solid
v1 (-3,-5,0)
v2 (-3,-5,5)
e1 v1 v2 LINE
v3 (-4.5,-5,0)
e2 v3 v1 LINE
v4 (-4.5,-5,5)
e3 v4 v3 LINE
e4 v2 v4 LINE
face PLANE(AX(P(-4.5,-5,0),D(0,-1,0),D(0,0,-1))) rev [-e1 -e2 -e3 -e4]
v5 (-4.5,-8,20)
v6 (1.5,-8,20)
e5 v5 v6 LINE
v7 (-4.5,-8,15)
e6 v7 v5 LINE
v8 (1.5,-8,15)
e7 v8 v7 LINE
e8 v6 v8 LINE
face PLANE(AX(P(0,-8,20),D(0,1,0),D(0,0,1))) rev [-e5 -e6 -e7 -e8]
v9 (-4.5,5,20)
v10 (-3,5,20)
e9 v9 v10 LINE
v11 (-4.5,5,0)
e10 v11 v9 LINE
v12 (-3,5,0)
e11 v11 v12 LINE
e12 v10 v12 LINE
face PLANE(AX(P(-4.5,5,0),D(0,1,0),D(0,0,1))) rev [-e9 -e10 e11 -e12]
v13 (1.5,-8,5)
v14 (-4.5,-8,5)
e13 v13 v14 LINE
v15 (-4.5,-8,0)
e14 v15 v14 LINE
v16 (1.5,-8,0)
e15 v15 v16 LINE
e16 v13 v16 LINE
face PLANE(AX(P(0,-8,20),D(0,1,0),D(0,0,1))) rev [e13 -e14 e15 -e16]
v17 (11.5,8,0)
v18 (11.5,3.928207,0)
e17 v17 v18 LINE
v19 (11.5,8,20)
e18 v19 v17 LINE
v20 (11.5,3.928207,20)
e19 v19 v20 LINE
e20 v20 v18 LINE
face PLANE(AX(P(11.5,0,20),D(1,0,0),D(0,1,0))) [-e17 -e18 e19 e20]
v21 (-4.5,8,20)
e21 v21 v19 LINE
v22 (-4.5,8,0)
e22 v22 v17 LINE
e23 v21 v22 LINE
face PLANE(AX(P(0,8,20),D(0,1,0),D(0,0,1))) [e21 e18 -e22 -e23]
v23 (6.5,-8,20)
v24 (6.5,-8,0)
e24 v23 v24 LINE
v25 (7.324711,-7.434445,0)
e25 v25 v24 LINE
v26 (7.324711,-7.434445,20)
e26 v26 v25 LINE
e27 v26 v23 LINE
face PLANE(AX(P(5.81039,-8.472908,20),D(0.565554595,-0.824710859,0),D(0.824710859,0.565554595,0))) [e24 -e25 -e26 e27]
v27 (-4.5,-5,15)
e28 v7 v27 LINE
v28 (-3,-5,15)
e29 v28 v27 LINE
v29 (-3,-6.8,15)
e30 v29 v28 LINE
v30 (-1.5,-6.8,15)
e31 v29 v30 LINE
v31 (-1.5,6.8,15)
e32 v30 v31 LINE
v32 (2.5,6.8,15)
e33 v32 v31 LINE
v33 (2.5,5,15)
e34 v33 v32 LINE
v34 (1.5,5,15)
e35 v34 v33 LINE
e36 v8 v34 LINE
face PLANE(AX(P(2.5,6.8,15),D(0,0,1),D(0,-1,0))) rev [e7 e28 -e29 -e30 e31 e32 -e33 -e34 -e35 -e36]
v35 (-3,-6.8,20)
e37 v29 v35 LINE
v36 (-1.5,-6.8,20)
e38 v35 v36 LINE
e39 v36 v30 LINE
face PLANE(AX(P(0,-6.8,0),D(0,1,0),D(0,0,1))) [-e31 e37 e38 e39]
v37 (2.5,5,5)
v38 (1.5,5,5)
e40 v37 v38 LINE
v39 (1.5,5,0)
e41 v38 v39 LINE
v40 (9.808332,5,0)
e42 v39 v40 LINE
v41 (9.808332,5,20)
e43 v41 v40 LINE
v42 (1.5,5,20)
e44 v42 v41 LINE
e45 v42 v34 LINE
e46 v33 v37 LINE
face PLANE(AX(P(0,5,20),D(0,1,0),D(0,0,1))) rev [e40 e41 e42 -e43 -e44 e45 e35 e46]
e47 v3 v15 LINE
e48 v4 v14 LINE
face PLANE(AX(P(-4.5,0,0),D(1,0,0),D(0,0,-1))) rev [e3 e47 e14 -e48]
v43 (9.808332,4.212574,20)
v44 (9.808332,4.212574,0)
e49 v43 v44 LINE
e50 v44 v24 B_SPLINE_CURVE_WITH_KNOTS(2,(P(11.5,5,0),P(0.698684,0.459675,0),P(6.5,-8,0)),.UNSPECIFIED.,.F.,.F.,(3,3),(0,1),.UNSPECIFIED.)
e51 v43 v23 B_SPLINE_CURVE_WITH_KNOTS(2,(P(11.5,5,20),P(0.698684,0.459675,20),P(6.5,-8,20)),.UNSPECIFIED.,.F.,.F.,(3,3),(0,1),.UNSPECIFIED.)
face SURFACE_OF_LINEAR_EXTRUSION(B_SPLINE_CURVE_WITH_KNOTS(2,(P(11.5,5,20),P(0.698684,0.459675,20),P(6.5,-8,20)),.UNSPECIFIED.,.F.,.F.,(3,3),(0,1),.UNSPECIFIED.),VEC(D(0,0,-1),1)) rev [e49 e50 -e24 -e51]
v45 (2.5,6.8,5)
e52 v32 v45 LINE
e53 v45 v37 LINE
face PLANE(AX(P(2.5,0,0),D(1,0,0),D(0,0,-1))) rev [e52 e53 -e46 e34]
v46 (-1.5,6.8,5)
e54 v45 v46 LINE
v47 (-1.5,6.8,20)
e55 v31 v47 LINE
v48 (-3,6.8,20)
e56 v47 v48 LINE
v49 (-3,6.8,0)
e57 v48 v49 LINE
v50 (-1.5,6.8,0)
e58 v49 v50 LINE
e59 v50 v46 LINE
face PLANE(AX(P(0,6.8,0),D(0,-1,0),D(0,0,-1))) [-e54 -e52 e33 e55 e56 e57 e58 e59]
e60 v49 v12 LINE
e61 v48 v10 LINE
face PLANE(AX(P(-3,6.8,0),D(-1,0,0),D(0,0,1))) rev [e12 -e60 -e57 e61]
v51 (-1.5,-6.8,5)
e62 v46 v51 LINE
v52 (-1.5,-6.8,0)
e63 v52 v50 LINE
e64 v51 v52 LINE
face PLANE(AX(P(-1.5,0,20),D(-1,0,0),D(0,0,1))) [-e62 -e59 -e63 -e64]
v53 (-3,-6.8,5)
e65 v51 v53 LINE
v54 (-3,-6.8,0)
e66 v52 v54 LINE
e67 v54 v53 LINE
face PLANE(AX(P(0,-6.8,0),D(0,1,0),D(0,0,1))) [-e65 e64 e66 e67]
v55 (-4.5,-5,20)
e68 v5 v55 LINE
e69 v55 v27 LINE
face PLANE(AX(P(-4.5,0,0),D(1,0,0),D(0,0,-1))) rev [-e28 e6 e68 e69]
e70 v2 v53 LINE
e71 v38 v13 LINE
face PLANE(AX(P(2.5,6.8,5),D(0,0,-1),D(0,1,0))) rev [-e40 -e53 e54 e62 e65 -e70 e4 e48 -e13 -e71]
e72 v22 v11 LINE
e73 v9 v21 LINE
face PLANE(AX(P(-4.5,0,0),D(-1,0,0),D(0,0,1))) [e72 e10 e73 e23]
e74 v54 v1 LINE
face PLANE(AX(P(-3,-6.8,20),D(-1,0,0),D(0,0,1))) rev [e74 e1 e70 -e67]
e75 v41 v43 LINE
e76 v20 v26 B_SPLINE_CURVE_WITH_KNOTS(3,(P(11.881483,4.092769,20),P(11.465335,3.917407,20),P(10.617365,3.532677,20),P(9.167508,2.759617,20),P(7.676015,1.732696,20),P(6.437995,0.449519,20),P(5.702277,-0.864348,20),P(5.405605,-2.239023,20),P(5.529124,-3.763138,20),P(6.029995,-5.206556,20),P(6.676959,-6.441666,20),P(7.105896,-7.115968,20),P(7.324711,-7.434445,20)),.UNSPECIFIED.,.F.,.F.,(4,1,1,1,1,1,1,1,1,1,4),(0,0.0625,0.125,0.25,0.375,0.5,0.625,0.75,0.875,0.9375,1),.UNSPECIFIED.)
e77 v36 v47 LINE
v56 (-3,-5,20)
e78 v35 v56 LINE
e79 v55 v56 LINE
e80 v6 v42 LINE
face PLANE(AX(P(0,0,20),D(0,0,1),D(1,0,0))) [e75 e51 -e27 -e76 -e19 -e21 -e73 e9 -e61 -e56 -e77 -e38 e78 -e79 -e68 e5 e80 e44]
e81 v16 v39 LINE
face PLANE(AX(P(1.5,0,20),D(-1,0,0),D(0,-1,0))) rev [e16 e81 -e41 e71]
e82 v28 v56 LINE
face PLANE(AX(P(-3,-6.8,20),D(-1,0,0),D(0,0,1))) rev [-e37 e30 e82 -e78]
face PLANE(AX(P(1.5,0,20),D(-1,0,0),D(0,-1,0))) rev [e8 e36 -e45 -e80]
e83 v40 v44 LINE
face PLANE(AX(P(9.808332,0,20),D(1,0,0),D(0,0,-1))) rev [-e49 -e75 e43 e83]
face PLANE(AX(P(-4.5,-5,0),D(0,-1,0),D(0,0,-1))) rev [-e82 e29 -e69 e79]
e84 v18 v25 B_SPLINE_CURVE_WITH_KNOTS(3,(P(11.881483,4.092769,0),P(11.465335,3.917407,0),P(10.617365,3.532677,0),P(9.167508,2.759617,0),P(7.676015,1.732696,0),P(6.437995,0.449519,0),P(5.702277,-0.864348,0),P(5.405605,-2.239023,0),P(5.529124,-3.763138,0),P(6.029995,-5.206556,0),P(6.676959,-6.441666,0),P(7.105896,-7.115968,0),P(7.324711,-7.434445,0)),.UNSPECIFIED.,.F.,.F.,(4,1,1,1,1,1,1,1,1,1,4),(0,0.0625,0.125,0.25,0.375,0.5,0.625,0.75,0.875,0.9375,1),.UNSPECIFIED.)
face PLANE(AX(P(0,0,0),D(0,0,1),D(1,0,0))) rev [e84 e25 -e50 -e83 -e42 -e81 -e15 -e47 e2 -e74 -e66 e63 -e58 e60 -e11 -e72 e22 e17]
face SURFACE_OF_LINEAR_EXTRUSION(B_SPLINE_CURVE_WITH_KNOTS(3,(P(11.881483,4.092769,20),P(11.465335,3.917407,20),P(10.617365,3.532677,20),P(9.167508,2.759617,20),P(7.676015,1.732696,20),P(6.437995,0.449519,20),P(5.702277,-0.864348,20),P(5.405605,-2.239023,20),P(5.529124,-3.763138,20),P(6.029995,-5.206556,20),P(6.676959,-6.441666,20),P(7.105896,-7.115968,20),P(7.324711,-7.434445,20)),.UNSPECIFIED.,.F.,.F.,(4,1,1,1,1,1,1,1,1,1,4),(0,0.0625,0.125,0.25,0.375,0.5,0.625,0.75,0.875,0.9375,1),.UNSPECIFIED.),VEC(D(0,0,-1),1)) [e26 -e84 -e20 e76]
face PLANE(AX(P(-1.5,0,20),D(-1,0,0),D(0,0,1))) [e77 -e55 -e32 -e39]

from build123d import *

# Parameters (mm, degrees)
AUFSATZ_LINEAR_AUSTRAGEN1_DEPTH = 20
SKIZZE2_W                       = 20
SKIZZE2_H                       = 3
AUFSATZ_LINEAR_AUSTRAGEN2_DEPTH = 3
SKIZZE3_W                       = 1.5
SKIZZE3_H                       = 20
SCHNITT_LINEAR_AUSTRAGEN1_DEPTH = 1.8
SKIZZE4_W                       = 1.5
SKIZZE4_H                       = 20
SCHNITT_LINEAR_AUSTRAGEN2_DEPTH = 1.8
SKIZZE14_W                      = 10
SKIZZE14_H                      = 13.6
SCHNITT_LINEAR_AUSTRAGEN5_DEPTH = 4
SKIZZE15_W                      = 10
SKIZZE15_H                      = 3
SCHNITT_LINEAR_AUSTRAGEN6_DEPTH = 6


# Read off the part's stored shape, not the designer's step: Aufsatz-Linear austragen1
with BuildPart() as part:
    # Aufsatz-Linear austragen1 outline → Aufsatz-Linear austragen1 (new body)
    with BuildSketch(Plane.XY):
        with BuildLine():
            Line((9.808332267, 5), (9.808332267, 4.212574368))
            add(Edge.make_bspline(
                [(9.808332267, 4.212574368), (1.184205361, -0.248328273), (6.5, -8)],
                knots=[0.083691521, 0.083691521, 0.083691521, 1, 1, 1], degree=2))
            Line((6.5, -8), (7.324710859, -7.434445405))
            add(Edge.make_bspline(
                [(11.5, 3.928207011), (11.209820184, 3.80014068), (10.506924616, 3.473790212), (9.167508184, 2.759616852), (7.676014914, 1.732695654), (6.437995439, 0.449518828), (5.702276721, -0.864348189), (5.405604765, -2.23902291), (5.529123845, -3.763138416), (6.029994776, -5.206555772), (6.676958994, -6.441666188), (7.105896283, -7.115968485), (7.324710859, -7.434445405)],
                knots=[0.019043297, 0.019043297, 0.019043297, 0.019043297, 0.0625, 0.125, 0.25, 0.375, 0.5, 0.625, 0.75, 0.875, 0.9375, 1, 1, 1, 1], degree=3))
            Line((11.5, 3.928207011), (11.5, 8))
            Line((11.5, 8), (-1.5, 8))
            Line((-1.5, 8), (-1.5, -8))
            Line((-1.5, -8), (1.5, -8))
            Line((1.5, -8), (1.5, 5))
            Line((1.5, 5), (9.808332267, 5))
        make_face()
    extrude(amount=AUFSATZ_LINEAR_AUSTRAGEN1_DEPTH)

    # Skizze2 → Aufsatz-Linear austragen2 (add)
    with BuildSketch(Plane.ZY.offset(1.5)):
        with Locations((10, 6.5)):
            Rectangle(SKIZZE2_W, SKIZZE2_H)
        with Locations((10, -6.5)):
            Rectangle(SKIZZE2_W, SKIZZE2_H)
    extrude(amount=AUFSATZ_LINEAR_AUSTRAGEN2_DEPTH)

    # Skizze3 → Schnitt-Linear austragen1 (cut)
    with BuildSketch(Plane.XZ.offset(-5)):
        with Locations((-2.25, 10)):
            Rectangle(SKIZZE3_W, SKIZZE3_H)
    extrude(amount=-SCHNITT_LINEAR_AUSTRAGEN1_DEPTH, mode=Mode.SUBTRACT)

    # Skizze4 → Schnitt-Linear austragen2 (cut)
    with BuildSketch(Plane(origin=(0, -5, 0), x_dir=(1, 0, 0), z_dir=(0, 1, 0))):
        with Locations((-2.25, -10)):
            Rectangle(SKIZZE4_W, SKIZZE4_H)
    extrude(amount=-SCHNITT_LINEAR_AUSTRAGEN2_DEPTH, mode=Mode.SUBTRACT)

    # Skizze14 → Schnitt-Linear austragen5 (cut)
    with BuildSketch(Plane.ZY.offset(1.5)):
        with Locations((10, 0)):
            Rectangle(SKIZZE14_W, SKIZZE14_H)
    extrude(amount=-SCHNITT_LINEAR_AUSTRAGEN5_DEPTH, mode=Mode.SUBTRACT)

    # Skizze15 → Schnitt-Linear austragen6 (cut)
    with BuildSketch(Plane.ZY.offset(4.5)):
        with Locations((10, -6.5)):
            Rectangle(SKIZZE15_W, SKIZZE15_H)
    extrude(amount=-SCHNITT_LINEAR_AUSTRAGEN6_DEPTH, mode=Mode.SUBTRACT)


solid = part.part
